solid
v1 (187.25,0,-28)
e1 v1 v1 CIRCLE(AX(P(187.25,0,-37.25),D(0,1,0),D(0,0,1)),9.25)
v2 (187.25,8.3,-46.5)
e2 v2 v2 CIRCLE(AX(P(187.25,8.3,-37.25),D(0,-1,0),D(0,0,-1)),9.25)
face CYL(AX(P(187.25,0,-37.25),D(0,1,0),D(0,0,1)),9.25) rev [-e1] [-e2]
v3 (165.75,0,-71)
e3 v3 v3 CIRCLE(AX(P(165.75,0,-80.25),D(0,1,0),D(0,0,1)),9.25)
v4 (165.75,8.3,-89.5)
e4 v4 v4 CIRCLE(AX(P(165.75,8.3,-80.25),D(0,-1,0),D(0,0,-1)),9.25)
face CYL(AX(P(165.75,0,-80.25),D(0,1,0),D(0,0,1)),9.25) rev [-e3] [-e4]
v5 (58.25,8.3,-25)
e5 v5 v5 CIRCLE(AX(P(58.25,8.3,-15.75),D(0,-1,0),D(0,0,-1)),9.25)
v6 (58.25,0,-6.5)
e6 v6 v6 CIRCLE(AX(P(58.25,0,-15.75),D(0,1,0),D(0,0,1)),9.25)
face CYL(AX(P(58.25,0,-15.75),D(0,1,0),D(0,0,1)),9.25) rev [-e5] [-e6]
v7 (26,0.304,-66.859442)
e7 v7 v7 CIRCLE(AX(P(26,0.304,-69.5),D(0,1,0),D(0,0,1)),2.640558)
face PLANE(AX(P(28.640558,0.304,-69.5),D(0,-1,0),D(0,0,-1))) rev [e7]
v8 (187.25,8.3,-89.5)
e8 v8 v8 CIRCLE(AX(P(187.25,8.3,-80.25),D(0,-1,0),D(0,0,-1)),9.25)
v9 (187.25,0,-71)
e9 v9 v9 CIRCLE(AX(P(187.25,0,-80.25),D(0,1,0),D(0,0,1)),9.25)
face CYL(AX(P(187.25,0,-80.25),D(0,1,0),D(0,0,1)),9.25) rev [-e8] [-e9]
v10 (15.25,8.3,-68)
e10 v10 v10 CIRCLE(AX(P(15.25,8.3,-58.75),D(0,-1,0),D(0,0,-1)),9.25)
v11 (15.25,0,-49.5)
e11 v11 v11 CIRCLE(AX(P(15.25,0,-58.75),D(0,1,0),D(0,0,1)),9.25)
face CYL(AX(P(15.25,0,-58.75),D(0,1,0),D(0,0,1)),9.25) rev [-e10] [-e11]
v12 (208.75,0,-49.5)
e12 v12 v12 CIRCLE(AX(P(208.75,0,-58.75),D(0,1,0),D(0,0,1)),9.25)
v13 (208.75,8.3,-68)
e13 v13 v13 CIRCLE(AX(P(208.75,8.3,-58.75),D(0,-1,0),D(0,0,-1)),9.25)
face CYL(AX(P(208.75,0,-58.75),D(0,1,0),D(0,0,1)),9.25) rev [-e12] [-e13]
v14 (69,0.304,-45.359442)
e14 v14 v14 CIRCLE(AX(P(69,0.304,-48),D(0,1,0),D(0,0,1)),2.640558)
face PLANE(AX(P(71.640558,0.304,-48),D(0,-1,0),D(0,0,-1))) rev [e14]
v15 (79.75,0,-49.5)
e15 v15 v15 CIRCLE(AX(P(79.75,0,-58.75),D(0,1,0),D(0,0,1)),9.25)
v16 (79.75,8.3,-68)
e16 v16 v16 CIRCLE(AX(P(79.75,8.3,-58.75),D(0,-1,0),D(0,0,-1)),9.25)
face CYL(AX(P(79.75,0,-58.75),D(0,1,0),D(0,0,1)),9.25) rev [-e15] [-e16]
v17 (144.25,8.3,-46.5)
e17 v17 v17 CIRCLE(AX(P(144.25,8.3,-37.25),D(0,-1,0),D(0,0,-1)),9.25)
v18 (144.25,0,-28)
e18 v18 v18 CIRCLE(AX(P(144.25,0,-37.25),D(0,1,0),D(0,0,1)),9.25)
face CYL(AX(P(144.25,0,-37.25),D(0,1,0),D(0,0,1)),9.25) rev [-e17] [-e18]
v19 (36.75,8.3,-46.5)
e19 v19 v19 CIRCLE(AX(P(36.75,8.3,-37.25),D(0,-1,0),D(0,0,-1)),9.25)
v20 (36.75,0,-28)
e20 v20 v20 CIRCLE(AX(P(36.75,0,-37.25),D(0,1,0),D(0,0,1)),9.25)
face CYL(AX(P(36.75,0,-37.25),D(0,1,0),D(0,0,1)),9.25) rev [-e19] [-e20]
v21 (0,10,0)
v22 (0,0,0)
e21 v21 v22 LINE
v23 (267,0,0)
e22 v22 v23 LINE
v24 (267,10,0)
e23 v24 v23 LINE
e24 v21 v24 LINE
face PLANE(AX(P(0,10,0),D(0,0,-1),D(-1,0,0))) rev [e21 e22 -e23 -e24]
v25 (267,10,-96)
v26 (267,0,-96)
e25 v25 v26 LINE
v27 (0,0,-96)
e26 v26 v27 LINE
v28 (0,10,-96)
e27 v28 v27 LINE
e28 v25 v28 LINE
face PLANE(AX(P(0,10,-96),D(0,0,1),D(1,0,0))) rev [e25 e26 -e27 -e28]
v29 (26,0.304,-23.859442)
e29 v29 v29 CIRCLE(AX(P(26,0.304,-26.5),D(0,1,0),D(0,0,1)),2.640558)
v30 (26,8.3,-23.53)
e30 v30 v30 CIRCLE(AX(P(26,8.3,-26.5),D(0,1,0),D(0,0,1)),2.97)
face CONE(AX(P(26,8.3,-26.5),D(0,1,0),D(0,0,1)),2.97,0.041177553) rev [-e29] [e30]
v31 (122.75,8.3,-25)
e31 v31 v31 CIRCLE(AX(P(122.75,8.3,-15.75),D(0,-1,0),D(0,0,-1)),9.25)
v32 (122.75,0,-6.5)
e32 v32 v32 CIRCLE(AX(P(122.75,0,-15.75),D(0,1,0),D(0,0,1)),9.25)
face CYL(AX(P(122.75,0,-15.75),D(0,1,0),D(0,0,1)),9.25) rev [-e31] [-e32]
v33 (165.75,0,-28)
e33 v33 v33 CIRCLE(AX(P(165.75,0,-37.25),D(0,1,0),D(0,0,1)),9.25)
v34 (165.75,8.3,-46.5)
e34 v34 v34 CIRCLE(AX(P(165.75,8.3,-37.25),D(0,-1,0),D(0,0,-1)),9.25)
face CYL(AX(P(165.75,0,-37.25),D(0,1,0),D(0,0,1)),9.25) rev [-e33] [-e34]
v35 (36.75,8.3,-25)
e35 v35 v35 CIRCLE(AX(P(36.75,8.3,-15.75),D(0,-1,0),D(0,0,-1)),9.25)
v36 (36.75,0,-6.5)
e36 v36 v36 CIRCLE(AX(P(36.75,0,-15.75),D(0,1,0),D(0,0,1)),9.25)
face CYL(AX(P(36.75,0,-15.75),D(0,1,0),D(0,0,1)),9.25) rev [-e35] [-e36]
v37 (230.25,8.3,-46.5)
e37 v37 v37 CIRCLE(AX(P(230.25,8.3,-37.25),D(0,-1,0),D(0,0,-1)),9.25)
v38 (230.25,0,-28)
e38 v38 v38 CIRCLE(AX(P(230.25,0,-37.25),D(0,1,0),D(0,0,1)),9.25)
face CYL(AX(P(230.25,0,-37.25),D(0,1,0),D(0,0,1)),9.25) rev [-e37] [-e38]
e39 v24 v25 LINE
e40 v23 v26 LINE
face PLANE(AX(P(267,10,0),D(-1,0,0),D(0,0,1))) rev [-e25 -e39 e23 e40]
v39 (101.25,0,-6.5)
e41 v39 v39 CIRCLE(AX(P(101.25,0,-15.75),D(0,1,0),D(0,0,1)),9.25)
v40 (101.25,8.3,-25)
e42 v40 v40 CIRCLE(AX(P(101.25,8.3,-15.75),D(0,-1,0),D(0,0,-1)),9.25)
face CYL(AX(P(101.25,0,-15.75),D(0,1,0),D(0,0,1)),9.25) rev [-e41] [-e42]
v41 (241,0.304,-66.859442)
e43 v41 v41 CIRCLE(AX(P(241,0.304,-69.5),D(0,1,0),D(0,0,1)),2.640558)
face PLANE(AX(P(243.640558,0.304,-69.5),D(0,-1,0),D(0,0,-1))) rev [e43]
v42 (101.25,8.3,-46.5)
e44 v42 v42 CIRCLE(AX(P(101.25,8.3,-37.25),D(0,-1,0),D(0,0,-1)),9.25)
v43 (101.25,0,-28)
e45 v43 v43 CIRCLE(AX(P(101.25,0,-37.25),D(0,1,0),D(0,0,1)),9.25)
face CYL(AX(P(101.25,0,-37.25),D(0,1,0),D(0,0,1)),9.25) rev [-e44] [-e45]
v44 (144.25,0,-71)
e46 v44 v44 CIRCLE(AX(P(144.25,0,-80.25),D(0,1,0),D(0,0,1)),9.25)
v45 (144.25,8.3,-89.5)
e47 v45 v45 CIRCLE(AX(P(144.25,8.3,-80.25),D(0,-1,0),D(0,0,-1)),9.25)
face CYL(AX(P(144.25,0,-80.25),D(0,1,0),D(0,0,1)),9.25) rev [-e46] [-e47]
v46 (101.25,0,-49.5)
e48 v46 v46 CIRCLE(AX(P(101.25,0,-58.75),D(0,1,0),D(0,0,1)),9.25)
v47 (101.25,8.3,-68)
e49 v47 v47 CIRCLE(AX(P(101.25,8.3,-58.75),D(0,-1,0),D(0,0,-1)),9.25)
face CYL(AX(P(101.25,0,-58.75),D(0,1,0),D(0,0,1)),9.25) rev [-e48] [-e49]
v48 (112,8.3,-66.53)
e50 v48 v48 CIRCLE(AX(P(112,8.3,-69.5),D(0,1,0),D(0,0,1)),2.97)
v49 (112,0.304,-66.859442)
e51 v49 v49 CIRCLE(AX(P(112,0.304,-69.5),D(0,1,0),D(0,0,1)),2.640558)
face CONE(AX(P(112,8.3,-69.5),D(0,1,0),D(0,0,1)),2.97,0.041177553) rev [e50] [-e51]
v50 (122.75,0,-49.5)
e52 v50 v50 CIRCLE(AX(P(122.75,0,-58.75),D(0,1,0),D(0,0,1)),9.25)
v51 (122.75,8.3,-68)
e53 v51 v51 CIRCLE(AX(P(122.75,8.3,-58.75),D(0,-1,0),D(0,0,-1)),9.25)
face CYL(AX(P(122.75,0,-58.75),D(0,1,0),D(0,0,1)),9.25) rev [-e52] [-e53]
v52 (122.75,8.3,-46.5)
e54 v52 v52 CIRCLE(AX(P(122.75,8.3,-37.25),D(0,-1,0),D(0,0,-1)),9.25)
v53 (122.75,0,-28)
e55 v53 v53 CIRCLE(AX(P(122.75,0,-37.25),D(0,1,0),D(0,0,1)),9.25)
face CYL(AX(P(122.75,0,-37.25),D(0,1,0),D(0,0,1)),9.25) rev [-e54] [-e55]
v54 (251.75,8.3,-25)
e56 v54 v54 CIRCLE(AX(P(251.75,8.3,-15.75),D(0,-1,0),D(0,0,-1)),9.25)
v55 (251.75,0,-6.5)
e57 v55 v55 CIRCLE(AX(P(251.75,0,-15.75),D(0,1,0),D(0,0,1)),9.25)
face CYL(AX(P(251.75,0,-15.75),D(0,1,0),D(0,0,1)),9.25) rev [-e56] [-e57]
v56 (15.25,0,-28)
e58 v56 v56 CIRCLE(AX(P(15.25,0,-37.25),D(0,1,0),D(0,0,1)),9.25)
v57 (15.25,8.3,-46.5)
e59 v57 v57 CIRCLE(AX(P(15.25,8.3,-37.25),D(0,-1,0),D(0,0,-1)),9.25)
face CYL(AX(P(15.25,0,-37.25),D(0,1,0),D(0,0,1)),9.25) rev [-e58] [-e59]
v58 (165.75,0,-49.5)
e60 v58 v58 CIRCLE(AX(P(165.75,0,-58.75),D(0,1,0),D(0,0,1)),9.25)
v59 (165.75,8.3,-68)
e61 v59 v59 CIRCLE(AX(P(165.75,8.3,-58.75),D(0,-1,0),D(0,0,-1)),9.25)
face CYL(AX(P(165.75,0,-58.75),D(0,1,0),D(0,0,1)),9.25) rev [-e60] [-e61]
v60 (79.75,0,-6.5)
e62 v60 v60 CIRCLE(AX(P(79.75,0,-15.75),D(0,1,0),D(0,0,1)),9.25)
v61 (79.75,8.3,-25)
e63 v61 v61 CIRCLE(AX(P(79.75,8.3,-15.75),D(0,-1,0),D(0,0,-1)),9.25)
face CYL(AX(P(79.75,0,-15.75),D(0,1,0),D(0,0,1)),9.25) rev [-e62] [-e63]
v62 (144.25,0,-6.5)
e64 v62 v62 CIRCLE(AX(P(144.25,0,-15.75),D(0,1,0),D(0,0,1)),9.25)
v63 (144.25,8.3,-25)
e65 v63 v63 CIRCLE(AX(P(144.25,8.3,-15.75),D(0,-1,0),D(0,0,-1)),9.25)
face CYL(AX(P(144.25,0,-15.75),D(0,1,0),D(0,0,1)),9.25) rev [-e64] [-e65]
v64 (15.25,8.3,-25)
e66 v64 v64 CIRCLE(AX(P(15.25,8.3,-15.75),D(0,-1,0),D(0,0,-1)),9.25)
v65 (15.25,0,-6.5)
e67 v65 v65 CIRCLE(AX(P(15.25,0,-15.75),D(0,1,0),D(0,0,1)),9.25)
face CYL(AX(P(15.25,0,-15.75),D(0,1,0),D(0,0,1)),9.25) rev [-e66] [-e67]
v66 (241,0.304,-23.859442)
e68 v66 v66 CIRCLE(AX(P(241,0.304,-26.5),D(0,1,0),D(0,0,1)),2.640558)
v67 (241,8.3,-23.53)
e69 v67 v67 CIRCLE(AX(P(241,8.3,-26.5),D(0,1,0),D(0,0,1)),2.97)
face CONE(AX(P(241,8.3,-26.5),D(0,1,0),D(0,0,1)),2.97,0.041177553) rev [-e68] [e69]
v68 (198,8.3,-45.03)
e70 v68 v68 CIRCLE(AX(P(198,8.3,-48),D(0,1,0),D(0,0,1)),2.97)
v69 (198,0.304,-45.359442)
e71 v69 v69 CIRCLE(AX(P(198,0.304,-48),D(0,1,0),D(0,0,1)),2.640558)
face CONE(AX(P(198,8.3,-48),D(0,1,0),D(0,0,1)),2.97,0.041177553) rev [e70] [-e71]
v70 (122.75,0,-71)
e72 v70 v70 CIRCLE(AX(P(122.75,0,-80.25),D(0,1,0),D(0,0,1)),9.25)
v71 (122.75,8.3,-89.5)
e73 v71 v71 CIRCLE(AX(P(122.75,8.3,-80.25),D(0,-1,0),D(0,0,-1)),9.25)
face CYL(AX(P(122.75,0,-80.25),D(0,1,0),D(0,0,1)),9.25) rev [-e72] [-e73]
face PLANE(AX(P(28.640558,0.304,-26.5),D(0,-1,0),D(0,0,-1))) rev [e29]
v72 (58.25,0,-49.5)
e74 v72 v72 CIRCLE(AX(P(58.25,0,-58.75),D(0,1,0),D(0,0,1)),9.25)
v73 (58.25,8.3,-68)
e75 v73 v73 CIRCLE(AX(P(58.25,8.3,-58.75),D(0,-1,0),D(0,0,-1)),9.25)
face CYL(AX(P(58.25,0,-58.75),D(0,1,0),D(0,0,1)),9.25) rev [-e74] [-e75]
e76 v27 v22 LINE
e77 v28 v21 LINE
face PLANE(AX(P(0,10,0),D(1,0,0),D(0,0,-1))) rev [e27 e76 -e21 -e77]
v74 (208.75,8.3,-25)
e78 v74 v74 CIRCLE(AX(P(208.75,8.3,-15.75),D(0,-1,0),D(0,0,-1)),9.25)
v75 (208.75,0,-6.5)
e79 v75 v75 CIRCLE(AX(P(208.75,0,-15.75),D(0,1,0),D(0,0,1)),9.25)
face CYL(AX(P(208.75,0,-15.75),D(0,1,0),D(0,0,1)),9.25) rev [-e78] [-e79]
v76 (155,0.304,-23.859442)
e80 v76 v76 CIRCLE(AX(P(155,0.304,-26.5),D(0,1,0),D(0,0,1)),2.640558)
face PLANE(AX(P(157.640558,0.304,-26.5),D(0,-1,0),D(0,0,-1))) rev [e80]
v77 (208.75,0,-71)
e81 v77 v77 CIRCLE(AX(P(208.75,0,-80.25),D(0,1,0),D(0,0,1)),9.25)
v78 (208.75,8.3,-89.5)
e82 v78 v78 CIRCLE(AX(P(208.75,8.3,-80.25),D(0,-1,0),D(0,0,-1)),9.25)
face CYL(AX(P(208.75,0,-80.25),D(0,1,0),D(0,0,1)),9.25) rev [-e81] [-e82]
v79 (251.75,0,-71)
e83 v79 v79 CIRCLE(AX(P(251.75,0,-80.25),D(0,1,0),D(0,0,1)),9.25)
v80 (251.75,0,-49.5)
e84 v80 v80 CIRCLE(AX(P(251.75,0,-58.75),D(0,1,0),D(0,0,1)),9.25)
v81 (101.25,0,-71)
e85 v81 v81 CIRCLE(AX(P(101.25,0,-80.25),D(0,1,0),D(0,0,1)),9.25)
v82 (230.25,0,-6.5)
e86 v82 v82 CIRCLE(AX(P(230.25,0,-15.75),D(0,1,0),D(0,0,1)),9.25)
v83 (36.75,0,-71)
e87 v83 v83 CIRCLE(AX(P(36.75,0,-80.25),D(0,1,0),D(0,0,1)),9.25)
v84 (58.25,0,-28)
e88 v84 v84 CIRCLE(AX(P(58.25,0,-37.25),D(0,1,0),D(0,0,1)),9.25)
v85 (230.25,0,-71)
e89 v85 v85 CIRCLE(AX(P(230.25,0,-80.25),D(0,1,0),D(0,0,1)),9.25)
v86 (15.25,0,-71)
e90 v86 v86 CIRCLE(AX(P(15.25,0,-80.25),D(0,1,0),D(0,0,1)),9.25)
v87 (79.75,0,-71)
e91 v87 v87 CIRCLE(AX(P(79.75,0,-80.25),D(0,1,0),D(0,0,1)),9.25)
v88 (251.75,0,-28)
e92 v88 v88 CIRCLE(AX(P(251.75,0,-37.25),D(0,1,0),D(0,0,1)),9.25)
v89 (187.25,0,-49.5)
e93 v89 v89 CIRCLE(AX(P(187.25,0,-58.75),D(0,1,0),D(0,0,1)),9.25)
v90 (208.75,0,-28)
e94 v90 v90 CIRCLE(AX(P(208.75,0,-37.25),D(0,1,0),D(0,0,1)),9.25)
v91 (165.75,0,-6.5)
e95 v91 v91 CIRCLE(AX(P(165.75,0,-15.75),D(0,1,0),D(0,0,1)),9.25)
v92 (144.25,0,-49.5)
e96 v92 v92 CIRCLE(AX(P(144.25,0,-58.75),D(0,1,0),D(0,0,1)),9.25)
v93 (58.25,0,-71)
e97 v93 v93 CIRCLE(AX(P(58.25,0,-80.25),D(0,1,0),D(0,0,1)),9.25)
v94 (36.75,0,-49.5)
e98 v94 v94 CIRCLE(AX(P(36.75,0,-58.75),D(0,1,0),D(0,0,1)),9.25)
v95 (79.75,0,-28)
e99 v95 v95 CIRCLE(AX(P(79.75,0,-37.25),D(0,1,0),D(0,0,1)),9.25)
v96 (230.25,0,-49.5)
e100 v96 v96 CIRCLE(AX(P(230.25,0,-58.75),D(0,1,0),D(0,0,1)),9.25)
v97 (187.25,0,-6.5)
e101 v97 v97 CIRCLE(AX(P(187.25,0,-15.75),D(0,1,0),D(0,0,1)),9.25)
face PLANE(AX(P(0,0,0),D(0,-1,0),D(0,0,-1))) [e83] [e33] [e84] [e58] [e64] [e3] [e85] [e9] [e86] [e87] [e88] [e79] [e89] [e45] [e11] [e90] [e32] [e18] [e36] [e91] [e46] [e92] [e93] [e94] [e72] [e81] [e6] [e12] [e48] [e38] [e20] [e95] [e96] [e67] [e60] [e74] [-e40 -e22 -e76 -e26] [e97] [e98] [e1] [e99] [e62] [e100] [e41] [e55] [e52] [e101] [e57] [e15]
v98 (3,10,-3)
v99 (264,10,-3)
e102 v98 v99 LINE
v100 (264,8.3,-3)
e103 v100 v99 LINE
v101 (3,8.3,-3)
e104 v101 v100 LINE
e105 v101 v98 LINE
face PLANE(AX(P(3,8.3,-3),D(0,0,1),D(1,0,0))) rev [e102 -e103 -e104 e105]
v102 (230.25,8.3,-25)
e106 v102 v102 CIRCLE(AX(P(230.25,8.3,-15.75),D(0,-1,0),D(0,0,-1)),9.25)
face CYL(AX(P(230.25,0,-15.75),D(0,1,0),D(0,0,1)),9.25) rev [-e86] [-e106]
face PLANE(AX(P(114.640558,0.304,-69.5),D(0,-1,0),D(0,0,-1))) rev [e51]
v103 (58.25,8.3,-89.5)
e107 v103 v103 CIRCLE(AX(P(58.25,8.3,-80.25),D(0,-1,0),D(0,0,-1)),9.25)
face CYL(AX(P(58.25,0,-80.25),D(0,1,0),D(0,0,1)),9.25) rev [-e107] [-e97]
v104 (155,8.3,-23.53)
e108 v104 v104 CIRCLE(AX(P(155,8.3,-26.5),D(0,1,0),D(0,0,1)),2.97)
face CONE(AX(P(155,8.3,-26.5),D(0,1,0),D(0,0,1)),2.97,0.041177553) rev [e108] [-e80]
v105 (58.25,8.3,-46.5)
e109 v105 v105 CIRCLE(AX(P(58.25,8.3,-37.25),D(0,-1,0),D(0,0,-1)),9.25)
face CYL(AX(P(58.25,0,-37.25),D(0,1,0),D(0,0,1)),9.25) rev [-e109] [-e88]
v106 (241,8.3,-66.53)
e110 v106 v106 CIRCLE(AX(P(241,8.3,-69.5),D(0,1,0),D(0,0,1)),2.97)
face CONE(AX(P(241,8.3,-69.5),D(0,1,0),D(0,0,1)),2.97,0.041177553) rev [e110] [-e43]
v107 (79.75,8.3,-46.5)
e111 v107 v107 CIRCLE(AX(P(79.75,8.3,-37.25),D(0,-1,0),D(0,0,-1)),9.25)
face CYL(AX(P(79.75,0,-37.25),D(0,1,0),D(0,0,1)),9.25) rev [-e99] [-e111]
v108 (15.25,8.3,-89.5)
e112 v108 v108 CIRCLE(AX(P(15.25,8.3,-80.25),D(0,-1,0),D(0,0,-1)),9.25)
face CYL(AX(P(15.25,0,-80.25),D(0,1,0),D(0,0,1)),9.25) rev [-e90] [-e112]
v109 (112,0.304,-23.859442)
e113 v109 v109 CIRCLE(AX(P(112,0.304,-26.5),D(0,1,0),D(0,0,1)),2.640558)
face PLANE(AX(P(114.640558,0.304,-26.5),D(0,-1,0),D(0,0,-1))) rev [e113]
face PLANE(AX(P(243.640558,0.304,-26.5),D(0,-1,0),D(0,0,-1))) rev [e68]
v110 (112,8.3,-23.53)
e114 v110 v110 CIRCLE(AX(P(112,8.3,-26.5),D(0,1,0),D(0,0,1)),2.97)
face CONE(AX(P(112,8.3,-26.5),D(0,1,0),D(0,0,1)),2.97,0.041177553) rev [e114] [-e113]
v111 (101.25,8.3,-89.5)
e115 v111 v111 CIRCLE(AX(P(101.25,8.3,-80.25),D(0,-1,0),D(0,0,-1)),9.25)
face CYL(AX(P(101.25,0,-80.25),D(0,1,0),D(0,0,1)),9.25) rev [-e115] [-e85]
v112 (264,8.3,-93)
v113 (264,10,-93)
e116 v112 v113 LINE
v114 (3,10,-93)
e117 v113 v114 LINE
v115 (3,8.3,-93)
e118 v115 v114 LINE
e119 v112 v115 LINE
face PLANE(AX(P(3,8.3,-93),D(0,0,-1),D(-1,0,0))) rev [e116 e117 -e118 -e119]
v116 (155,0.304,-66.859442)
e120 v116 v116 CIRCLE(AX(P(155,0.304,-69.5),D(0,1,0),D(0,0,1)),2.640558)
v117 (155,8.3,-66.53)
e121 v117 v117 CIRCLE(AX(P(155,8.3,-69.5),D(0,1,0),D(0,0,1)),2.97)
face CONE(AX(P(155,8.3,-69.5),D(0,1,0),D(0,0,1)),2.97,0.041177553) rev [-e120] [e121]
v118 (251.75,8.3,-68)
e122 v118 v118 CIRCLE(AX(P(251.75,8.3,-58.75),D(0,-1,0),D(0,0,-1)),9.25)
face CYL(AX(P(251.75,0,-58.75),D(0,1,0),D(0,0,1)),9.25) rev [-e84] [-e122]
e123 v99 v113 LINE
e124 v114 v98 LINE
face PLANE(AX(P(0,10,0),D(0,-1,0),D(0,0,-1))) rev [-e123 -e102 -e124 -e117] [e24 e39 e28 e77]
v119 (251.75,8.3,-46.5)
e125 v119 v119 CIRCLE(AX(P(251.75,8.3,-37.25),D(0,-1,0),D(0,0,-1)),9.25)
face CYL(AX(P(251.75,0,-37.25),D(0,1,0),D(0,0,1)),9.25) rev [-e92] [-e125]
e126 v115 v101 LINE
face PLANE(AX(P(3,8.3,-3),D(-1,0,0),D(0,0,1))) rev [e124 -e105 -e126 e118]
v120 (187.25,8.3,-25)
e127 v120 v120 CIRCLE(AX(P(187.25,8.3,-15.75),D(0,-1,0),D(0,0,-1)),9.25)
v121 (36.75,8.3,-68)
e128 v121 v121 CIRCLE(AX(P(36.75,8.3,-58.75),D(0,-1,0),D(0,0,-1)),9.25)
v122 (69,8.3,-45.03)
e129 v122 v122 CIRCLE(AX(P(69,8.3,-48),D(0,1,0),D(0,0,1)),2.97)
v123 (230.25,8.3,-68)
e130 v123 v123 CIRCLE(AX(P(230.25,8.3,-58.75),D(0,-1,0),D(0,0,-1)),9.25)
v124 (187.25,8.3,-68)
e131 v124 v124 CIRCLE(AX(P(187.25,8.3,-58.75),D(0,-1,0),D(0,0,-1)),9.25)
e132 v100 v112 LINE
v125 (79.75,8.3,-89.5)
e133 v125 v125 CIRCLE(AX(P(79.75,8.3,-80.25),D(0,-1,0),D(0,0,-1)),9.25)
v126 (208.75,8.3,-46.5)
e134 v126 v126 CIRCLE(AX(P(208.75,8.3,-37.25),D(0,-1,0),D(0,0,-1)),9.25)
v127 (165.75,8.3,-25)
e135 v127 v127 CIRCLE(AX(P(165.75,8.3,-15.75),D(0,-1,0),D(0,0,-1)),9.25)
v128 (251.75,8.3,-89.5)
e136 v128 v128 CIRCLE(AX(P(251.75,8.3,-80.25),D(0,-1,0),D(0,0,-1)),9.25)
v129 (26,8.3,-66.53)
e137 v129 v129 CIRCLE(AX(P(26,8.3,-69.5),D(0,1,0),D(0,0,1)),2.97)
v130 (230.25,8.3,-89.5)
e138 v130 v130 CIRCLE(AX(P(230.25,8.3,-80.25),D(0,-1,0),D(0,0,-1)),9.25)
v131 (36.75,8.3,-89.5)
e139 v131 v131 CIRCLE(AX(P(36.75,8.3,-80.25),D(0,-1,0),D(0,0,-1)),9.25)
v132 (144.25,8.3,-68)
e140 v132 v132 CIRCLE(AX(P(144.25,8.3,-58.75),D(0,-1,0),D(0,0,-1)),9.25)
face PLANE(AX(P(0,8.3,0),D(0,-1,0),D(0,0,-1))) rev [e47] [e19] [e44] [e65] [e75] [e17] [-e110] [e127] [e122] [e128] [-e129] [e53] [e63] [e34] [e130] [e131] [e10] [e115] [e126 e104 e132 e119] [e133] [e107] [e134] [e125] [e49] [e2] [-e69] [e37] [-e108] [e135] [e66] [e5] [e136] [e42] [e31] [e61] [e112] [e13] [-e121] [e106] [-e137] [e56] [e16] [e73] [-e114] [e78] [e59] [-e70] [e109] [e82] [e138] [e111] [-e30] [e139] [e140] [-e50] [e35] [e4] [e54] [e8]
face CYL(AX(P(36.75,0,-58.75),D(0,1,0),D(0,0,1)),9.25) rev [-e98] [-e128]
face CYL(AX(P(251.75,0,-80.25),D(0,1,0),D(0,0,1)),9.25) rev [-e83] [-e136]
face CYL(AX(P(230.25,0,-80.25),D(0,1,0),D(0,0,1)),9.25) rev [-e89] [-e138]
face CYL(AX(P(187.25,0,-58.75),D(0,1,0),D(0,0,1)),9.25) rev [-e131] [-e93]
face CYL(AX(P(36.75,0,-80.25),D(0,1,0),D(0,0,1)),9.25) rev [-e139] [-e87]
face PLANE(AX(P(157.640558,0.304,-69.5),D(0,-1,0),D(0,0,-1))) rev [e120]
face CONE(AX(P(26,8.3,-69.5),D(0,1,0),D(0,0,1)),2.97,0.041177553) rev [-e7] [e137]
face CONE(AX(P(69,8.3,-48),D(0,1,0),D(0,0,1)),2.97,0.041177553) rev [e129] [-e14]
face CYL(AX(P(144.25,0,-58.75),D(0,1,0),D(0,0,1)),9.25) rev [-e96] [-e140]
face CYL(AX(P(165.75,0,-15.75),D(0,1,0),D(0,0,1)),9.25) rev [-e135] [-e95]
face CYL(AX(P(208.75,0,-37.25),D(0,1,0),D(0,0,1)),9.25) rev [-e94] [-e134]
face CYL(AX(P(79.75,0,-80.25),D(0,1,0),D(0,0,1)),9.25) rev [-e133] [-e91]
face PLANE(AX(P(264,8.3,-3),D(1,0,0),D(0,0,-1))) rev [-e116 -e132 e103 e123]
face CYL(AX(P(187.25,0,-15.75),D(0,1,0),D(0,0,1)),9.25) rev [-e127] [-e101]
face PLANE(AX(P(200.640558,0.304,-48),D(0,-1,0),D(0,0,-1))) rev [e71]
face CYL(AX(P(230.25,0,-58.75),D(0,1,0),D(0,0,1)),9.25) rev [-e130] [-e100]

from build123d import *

# Parameters (mm, degrees)
SKETCH1_W                  = 267
SKETCH1_H                  = 96
BOSS_EXTRUDE1_DEPTH        = 10
SKETCH5_W                  = 261
SKETCH5_H                  = 90
CUT_EXTRUDE2_DEPTH         = 1.7
SKETCH2_R                  = 9.25
CUT_EXTRUDE1_DEPTH         = 10
LPATTERN1_COUNT            = 4
LPATTERN1_PITCH            = 21.5
LPATTERN1_COUNT_DIR2       = 12
LPATTERN1_PITCH_DIR2       = 21.5
ADVANCEDHOLE2_OUTLINE_R    = 2.640558065
ADVANCEDHOLE2_DEPTH        = 7.996
ADVANCEDHOLE2_DRAFT        = -2.3593
ADVANCEDHOLE2_2_OUTLINE_R  = 2.640558065
ADVANCEDHOLE2_2_DEPTH      = 7.996
ADVANCEDHOLE2_2_DRAFT      = -2.3593
ADVANCEDHOLE2_3_OUTLINE_R  = 2.640558065
ADVANCEDHOLE2_3_DEPTH      = 7.996
ADVANCEDHOLE2_3_DRAFT      = -2.3593
ADVANCEDHOLE2_4_OUTLINE_R  = 2.640558065
ADVANCEDHOLE2_4_DEPTH      = 7.996
ADVANCEDHOLE2_4_DRAFT      = -2.3593
ADVANCEDHOLE2_5_OUTLINE_R  = 2.640558065
ADVANCEDHOLE2_5_DEPTH      = 7.996
ADVANCEDHOLE2_5_DRAFT      = -2.3593
ADVANCEDHOLE2_6_OUTLINE_R  = 2.640558065
ADVANCEDHOLE2_6_DEPTH      = 7.996
ADVANCEDHOLE2_6_DRAFT      = -2.3593
ADVANCEDHOLE2_7_OUTLINE_R  = 2.640558065
ADVANCEDHOLE2_7_DEPTH      = 7.996
ADVANCEDHOLE2_7_DRAFT      = -2.3593
ADVANCEDHOLE2_8_OUTLINE_R  = 2.640558065
ADVANCEDHOLE2_8_DEPTH      = 7.996
ADVANCEDHOLE2_8_DRAFT      = -2.3593
ADVANCEDHOLE2_9_OUTLINE_R  = 2.640558065
ADVANCEDHOLE2_9_DEPTH      = 7.996
ADVANCEDHOLE2_9_DRAFT      = -2.3593
ADVANCEDHOLE2_10_OUTLINE_R = 2.640558065
ADVANCEDHOLE2_10_DEPTH     = 7.996
ADVANCEDHOLE2_10_DRAFT     = -2.3593


# Read off the part's stored shape, not the designer's step: AdvancedHole2
with BuildPart() as part:
    # Sketch1 → Boss-Extrude1 (new body)
    with BuildSketch(Plane(origin=(0, 0, 0), x_dir=(1, 0, 0), z_dir=(0, 1, 0))):
        with Locations((133.5, 48)):
            Rectangle(SKETCH1_W, SKETCH1_H)
    extrude(amount=BOSS_EXTRUDE1_DEPTH)

    # Sketch5 → Cut-Extrude2 (cut)
    with BuildSketch(Plane(origin=(0, 10, 0), x_dir=(1, 0, 0), z_dir=(0, 1, 0))):
        with Locations((133.5, 48)):
            Rectangle(SKETCH5_W, SKETCH5_H)
    extrude(amount=-CUT_EXTRUDE2_DEPTH, mode=Mode.SUBTRACT)

    # Sketch2 → Cut-Extrude1 (cut)
    with BuildSketch(Plane(origin=(0, 10, 0), x_dir=(1, 0, 0), z_dir=(0, 1, 0))):
        with Locations(Location((15.25, 15.75, 0), (0, 0, 270))):
            Circle(SKETCH2_R)
    cut_extrude1 = extrude(amount=-CUT_EXTRUDE1_DEPTH, mode=Mode.SUBTRACT)

    # LPattern1: Cut-Extrude1 4 × 12
    with Locations(*[(j * LPATTERN1_PITCH_DIR2, 0, -i * LPATTERN1_PITCH) for i in range(LPATTERN1_COUNT) for j in range(LPATTERN1_COUNT_DIR2) if (i, j) != (0, 0)]):
        add(cut_extrude1, mode=Mode.SUBTRACT)


with BuildPart() as advancedhole2_tool:
    # AdvancedHole2 outline → AdvancedHole2 (with draft: the straight prism first)
    with BuildSketch(Plane(origin=(0, 0.304, 0), x_dir=(1, 0, 0), z_dir=(0, 1, 0))):
        with Locations((155, 69.5)):
            Circle(ADVANCEDHOLE2_OUTLINE_R)
    extrude(amount=ADVANCEDHOLE2_DEPTH)
    # AdvancedHole2: the draft: its side faces are tilted about the plane it starts from
    advancedhole2_sides = [advancedhole2_tool.faces().sort_by_distance(p)[0] for p in [
        (152.359441935, 4.302, -69.5),
    ]]
    draft(advancedhole2_sides, Plane(origin=(0, 0.304, 0), x_dir=(1, 0, 0), z_dir=(0, 1, 0)), ADVANCEDHOLE2_DRAFT)


with BuildPart() as part_1:
    add(part.part)

    # AdvancedHole2: cut by advancedhole2_tool
    add(advancedhole2_tool.part, mode=Mode.SUBTRACT)


with BuildPart() as advancedhole2_2_tool:
    # AdvancedHole2 2 outline → AdvancedHole2 2 (with draft: the straight prism first)
    with BuildSketch(Plane(origin=(0, 0.304, 0), x_dir=(1, 0, 0), z_dir=(0, 1, 0))):
        with Locations((155, 26.5)):
            Circle(ADVANCEDHOLE2_2_OUTLINE_R)
    extrude(amount=ADVANCEDHOLE2_2_DEPTH)
    # AdvancedHole2 2: the draft: its side faces are tilted about the plane it starts from
    advancedhole2_2_sides = [advancedhole2_2_tool.faces().sort_by_distance(p)[0] for p in [
        (152.359441935, 4.302, -26.5),
    ]]
    draft(advancedhole2_2_sides, Plane(origin=(0, 0.304, 0), x_dir=(1, 0, 0), z_dir=(0, 1, 0)), ADVANCEDHOLE2_2_DRAFT)


with BuildPart() as part_2:
    add(part_1.part)

    # AdvancedHole2 2: cut by advancedhole2_2_tool
    add(advancedhole2_2_tool.part, mode=Mode.SUBTRACT)


with BuildPart() as advancedhole2_3_tool:
    # AdvancedHole2 3 outline → AdvancedHole2 3 (with draft: the straight prism first)
    with BuildSketch(Plane(origin=(0, 0.304, 0), x_dir=(1, 0, 0), z_dir=(0, 1, 0))):
        with Locations((112, 26.5)):
            Circle(ADVANCEDHOLE2_3_OUTLINE_R)
    extrude(amount=ADVANCEDHOLE2_3_DEPTH)
    # AdvancedHole2 3: the draft: its side faces are tilted about the plane it starts from
    advancedhole2_3_sides = [advancedhole2_3_tool.faces().sort_by_distance(p)[0] for p in [
        (109.359441935, 4.302, -26.5),
    ]]
    draft(advancedhole2_3_sides, Plane(origin=(0, 0.304, 0), x_dir=(1, 0, 0), z_dir=(0, 1, 0)), ADVANCEDHOLE2_3_DRAFT)


with BuildPart() as part_3:
    add(part_2.part)

    # AdvancedHole2 3: cut by advancedhole2_3_tool
    add(advancedhole2_3_tool.part, mode=Mode.SUBTRACT)


with BuildPart() as advancedhole2_4_tool:
    # AdvancedHole2 4 outline → AdvancedHole2 4 (with draft: the straight prism first)
    with BuildSketch(Plane(origin=(0, 0.304, 0), x_dir=(1, 0, 0), z_dir=(0, 1, 0))):
        with Locations((112, 69.5)):
            Circle(ADVANCEDHOLE2_4_OUTLINE_R)
    extrude(amount=ADVANCEDHOLE2_4_DEPTH)
    # AdvancedHole2 4: the draft: its side faces are tilted about the plane it starts from
    advancedhole2_4_sides = [advancedhole2_4_tool.faces().sort_by_distance(p)[0] for p in [
        (109.359441935, 4.302, -69.5),
    ]]
    draft(advancedhole2_4_sides, Plane(origin=(0, 0.304, 0), x_dir=(1, 0, 0), z_dir=(0, 1, 0)), ADVANCEDHOLE2_4_DRAFT)


with BuildPart() as part_4:
    add(part_3.part)

    # AdvancedHole2 4: cut by advancedhole2_4_tool
    add(advancedhole2_4_tool.part, mode=Mode.SUBTRACT)


with BuildPart() as advancedhole2_5_tool:
    # AdvancedHole2 5 outline → AdvancedHole2 5 (with draft: the straight prism first)
    with BuildSketch(Plane(origin=(0, 0.304, 0), x_dir=(1, 0, 0), z_dir=(0, 1, 0))):
        with Locations((198, 48)):
            Circle(ADVANCEDHOLE2_5_OUTLINE_R)
    extrude(amount=ADVANCEDHOLE2_5_DEPTH)
    # AdvancedHole2 5: the draft: its side faces are tilted about the plane it starts from
    advancedhole2_5_sides = [advancedhole2_5_tool.faces().sort_by_distance(p)[0] for p in [
        (195.359441935, 4.302, -48),
    ]]
    draft(advancedhole2_5_sides, Plane(origin=(0, 0.304, 0), x_dir=(1, 0, 0), z_dir=(0, 1, 0)), ADVANCEDHOLE2_5_DRAFT)


with BuildPart() as part_5:
    add(part_4.part)

    # AdvancedHole2 5: cut by advancedhole2_5_tool
    add(advancedhole2_5_tool.part, mode=Mode.SUBTRACT)


with BuildPart() as advancedhole2_6_tool:
    # AdvancedHole2 6 outline → AdvancedHole2 6 (with draft: the straight prism first)
    with BuildSketch(Plane(origin=(0, 0.304, 0), x_dir=(1, 0, 0), z_dir=(0, 1, 0))):
        with Locations((69, 48)):
            Circle(ADVANCEDHOLE2_6_OUTLINE_R)
    extrude(amount=ADVANCEDHOLE2_6_DEPTH)
    # AdvancedHole2 6: the draft: its side faces are tilted about the plane it starts from
    advancedhole2_6_sides = [advancedhole2_6_tool.faces().sort_by_distance(p)[0] for p in [
        (66.359441935, 4.302, -48),
    ]]
    draft(advancedhole2_6_sides, Plane(origin=(0, 0.304, 0), x_dir=(1, 0, 0), z_dir=(0, 1, 0)), ADVANCEDHOLE2_6_DRAFT)


with BuildPart() as part_6:
    add(part_5.part)

    # AdvancedHole2 6: cut by advancedhole2_6_tool
    add(advancedhole2_6_tool.part, mode=Mode.SUBTRACT)


with BuildPart() as advancedhole2_7_tool:
    # AdvancedHole2 7 outline → AdvancedHole2 7 (with draft: the straight prism first)
    with BuildSketch(Plane(origin=(0, 0.304, 0), x_dir=(1, 0, 0), z_dir=(0, 1, 0))):
        with Locations((26, 26.5)):
            Circle(ADVANCEDHOLE2_7_OUTLINE_R)
    extrude(amount=ADVANCEDHOLE2_7_DEPTH)
    # AdvancedHole2 7: the draft: its side faces are tilted about the plane it starts from
    advancedhole2_7_sides = [advancedhole2_7_tool.faces().sort_by_distance(p)[0] for p in [
        (23.359441935, 4.302, -26.5),
    ]]
    draft(advancedhole2_7_sides, Plane(origin=(0, 0.304, 0), x_dir=(1, 0, 0), z_dir=(0, 1, 0)), ADVANCEDHOLE2_7_DRAFT)


with BuildPart() as part_7:
    add(part_6.part)

    # AdvancedHole2 7: cut by advancedhole2_7_tool
    add(advancedhole2_7_tool.part, mode=Mode.SUBTRACT)


with BuildPart() as advancedhole2_8_tool:
    # AdvancedHole2 8 outline → AdvancedHole2 8 (with draft: the straight prism first)
    with BuildSketch(Plane(origin=(0, 0.304, 0), x_dir=(1, 0, 0), z_dir=(0, 1, 0))):
        with Locations((241, 26.5)):
            Circle(ADVANCEDHOLE2_8_OUTLINE_R)
    extrude(amount=ADVANCEDHOLE2_8_DEPTH)
    # AdvancedHole2 8: the draft: its side faces are tilted about the plane it starts from
    advancedhole2_8_sides = [advancedhole2_8_tool.faces().sort_by_distance(p)[0] for p in [
        (238.359441935, 4.302, -26.5),
    ]]
    draft(advancedhole2_8_sides, Plane(origin=(0, 0.304, 0), x_dir=(1, 0, 0), z_dir=(0, 1, 0)), ADVANCEDHOLE2_8_DRAFT)


with BuildPart() as part_8:
    add(part_7.part)

    # AdvancedHole2 8: cut by advancedhole2_8_tool
    add(advancedhole2_8_tool.part, mode=Mode.SUBTRACT)


with BuildPart() as advancedhole2_9_tool:
    # AdvancedHole2 9 outline → AdvancedHole2 9 (with draft: the straight prism first)
    with BuildSketch(Plane(origin=(0, 0.304, 0), x_dir=(1, 0, 0), z_dir=(0, 1, 0))):
        with Locations((241, 69.5)):
            Circle(ADVANCEDHOLE2_9_OUTLINE_R)
    extrude(amount=ADVANCEDHOLE2_9_DEPTH)
    # AdvancedHole2 9: the draft: its side faces are tilted about the plane it starts from
    advancedhole2_9_sides = [advancedhole2_9_tool.faces().sort_by_distance(p)[0] for p in [
        (238.359441935, 4.302, -69.5),
    ]]
    draft(advancedhole2_9_sides, Plane(origin=(0, 0.304, 0), x_dir=(1, 0, 0), z_dir=(0, 1, 0)), ADVANCEDHOLE2_9_DRAFT)


with BuildPart() as part_9:
    add(part_8.part)

    # AdvancedHole2 9: cut by advancedhole2_9_tool
    add(advancedhole2_9_tool.part, mode=Mode.SUBTRACT)


with BuildPart() as advancedhole2_10_tool:
    # AdvancedHole2 10 outline → AdvancedHole2 10 (with draft: the straight prism first)
    with BuildSketch(Plane(origin=(0, 0.304, 0), x_dir=(1, 0, 0), z_dir=(0, 1, 0))):
        with Locations((26, 69.5)):
            Circle(ADVANCEDHOLE2_10_OUTLINE_R)
    extrude(amount=ADVANCEDHOLE2_10_DEPTH)
    # AdvancedHole2 10: the draft: its side faces are tilted about the plane it starts from
    advancedhole2_10_sides = [advancedhole2_10_tool.faces().sort_by_distance(p)[0] for p in [
        (23.359441935, 4.302, -69.5),
    ]]
    draft(advancedhole2_10_sides, Plane(origin=(0, 0.304, 0), x_dir=(1, 0, 0), z_dir=(0, 1, 0)), ADVANCEDHOLE2_10_DRAFT)


with BuildPart() as part_10:
    add(part_9.part)

    # AdvancedHole2 10: cut by advancedhole2_10_tool
    add(advancedhole2_10_tool.part, mode=Mode.SUBTRACT)


solid = part_10.part
